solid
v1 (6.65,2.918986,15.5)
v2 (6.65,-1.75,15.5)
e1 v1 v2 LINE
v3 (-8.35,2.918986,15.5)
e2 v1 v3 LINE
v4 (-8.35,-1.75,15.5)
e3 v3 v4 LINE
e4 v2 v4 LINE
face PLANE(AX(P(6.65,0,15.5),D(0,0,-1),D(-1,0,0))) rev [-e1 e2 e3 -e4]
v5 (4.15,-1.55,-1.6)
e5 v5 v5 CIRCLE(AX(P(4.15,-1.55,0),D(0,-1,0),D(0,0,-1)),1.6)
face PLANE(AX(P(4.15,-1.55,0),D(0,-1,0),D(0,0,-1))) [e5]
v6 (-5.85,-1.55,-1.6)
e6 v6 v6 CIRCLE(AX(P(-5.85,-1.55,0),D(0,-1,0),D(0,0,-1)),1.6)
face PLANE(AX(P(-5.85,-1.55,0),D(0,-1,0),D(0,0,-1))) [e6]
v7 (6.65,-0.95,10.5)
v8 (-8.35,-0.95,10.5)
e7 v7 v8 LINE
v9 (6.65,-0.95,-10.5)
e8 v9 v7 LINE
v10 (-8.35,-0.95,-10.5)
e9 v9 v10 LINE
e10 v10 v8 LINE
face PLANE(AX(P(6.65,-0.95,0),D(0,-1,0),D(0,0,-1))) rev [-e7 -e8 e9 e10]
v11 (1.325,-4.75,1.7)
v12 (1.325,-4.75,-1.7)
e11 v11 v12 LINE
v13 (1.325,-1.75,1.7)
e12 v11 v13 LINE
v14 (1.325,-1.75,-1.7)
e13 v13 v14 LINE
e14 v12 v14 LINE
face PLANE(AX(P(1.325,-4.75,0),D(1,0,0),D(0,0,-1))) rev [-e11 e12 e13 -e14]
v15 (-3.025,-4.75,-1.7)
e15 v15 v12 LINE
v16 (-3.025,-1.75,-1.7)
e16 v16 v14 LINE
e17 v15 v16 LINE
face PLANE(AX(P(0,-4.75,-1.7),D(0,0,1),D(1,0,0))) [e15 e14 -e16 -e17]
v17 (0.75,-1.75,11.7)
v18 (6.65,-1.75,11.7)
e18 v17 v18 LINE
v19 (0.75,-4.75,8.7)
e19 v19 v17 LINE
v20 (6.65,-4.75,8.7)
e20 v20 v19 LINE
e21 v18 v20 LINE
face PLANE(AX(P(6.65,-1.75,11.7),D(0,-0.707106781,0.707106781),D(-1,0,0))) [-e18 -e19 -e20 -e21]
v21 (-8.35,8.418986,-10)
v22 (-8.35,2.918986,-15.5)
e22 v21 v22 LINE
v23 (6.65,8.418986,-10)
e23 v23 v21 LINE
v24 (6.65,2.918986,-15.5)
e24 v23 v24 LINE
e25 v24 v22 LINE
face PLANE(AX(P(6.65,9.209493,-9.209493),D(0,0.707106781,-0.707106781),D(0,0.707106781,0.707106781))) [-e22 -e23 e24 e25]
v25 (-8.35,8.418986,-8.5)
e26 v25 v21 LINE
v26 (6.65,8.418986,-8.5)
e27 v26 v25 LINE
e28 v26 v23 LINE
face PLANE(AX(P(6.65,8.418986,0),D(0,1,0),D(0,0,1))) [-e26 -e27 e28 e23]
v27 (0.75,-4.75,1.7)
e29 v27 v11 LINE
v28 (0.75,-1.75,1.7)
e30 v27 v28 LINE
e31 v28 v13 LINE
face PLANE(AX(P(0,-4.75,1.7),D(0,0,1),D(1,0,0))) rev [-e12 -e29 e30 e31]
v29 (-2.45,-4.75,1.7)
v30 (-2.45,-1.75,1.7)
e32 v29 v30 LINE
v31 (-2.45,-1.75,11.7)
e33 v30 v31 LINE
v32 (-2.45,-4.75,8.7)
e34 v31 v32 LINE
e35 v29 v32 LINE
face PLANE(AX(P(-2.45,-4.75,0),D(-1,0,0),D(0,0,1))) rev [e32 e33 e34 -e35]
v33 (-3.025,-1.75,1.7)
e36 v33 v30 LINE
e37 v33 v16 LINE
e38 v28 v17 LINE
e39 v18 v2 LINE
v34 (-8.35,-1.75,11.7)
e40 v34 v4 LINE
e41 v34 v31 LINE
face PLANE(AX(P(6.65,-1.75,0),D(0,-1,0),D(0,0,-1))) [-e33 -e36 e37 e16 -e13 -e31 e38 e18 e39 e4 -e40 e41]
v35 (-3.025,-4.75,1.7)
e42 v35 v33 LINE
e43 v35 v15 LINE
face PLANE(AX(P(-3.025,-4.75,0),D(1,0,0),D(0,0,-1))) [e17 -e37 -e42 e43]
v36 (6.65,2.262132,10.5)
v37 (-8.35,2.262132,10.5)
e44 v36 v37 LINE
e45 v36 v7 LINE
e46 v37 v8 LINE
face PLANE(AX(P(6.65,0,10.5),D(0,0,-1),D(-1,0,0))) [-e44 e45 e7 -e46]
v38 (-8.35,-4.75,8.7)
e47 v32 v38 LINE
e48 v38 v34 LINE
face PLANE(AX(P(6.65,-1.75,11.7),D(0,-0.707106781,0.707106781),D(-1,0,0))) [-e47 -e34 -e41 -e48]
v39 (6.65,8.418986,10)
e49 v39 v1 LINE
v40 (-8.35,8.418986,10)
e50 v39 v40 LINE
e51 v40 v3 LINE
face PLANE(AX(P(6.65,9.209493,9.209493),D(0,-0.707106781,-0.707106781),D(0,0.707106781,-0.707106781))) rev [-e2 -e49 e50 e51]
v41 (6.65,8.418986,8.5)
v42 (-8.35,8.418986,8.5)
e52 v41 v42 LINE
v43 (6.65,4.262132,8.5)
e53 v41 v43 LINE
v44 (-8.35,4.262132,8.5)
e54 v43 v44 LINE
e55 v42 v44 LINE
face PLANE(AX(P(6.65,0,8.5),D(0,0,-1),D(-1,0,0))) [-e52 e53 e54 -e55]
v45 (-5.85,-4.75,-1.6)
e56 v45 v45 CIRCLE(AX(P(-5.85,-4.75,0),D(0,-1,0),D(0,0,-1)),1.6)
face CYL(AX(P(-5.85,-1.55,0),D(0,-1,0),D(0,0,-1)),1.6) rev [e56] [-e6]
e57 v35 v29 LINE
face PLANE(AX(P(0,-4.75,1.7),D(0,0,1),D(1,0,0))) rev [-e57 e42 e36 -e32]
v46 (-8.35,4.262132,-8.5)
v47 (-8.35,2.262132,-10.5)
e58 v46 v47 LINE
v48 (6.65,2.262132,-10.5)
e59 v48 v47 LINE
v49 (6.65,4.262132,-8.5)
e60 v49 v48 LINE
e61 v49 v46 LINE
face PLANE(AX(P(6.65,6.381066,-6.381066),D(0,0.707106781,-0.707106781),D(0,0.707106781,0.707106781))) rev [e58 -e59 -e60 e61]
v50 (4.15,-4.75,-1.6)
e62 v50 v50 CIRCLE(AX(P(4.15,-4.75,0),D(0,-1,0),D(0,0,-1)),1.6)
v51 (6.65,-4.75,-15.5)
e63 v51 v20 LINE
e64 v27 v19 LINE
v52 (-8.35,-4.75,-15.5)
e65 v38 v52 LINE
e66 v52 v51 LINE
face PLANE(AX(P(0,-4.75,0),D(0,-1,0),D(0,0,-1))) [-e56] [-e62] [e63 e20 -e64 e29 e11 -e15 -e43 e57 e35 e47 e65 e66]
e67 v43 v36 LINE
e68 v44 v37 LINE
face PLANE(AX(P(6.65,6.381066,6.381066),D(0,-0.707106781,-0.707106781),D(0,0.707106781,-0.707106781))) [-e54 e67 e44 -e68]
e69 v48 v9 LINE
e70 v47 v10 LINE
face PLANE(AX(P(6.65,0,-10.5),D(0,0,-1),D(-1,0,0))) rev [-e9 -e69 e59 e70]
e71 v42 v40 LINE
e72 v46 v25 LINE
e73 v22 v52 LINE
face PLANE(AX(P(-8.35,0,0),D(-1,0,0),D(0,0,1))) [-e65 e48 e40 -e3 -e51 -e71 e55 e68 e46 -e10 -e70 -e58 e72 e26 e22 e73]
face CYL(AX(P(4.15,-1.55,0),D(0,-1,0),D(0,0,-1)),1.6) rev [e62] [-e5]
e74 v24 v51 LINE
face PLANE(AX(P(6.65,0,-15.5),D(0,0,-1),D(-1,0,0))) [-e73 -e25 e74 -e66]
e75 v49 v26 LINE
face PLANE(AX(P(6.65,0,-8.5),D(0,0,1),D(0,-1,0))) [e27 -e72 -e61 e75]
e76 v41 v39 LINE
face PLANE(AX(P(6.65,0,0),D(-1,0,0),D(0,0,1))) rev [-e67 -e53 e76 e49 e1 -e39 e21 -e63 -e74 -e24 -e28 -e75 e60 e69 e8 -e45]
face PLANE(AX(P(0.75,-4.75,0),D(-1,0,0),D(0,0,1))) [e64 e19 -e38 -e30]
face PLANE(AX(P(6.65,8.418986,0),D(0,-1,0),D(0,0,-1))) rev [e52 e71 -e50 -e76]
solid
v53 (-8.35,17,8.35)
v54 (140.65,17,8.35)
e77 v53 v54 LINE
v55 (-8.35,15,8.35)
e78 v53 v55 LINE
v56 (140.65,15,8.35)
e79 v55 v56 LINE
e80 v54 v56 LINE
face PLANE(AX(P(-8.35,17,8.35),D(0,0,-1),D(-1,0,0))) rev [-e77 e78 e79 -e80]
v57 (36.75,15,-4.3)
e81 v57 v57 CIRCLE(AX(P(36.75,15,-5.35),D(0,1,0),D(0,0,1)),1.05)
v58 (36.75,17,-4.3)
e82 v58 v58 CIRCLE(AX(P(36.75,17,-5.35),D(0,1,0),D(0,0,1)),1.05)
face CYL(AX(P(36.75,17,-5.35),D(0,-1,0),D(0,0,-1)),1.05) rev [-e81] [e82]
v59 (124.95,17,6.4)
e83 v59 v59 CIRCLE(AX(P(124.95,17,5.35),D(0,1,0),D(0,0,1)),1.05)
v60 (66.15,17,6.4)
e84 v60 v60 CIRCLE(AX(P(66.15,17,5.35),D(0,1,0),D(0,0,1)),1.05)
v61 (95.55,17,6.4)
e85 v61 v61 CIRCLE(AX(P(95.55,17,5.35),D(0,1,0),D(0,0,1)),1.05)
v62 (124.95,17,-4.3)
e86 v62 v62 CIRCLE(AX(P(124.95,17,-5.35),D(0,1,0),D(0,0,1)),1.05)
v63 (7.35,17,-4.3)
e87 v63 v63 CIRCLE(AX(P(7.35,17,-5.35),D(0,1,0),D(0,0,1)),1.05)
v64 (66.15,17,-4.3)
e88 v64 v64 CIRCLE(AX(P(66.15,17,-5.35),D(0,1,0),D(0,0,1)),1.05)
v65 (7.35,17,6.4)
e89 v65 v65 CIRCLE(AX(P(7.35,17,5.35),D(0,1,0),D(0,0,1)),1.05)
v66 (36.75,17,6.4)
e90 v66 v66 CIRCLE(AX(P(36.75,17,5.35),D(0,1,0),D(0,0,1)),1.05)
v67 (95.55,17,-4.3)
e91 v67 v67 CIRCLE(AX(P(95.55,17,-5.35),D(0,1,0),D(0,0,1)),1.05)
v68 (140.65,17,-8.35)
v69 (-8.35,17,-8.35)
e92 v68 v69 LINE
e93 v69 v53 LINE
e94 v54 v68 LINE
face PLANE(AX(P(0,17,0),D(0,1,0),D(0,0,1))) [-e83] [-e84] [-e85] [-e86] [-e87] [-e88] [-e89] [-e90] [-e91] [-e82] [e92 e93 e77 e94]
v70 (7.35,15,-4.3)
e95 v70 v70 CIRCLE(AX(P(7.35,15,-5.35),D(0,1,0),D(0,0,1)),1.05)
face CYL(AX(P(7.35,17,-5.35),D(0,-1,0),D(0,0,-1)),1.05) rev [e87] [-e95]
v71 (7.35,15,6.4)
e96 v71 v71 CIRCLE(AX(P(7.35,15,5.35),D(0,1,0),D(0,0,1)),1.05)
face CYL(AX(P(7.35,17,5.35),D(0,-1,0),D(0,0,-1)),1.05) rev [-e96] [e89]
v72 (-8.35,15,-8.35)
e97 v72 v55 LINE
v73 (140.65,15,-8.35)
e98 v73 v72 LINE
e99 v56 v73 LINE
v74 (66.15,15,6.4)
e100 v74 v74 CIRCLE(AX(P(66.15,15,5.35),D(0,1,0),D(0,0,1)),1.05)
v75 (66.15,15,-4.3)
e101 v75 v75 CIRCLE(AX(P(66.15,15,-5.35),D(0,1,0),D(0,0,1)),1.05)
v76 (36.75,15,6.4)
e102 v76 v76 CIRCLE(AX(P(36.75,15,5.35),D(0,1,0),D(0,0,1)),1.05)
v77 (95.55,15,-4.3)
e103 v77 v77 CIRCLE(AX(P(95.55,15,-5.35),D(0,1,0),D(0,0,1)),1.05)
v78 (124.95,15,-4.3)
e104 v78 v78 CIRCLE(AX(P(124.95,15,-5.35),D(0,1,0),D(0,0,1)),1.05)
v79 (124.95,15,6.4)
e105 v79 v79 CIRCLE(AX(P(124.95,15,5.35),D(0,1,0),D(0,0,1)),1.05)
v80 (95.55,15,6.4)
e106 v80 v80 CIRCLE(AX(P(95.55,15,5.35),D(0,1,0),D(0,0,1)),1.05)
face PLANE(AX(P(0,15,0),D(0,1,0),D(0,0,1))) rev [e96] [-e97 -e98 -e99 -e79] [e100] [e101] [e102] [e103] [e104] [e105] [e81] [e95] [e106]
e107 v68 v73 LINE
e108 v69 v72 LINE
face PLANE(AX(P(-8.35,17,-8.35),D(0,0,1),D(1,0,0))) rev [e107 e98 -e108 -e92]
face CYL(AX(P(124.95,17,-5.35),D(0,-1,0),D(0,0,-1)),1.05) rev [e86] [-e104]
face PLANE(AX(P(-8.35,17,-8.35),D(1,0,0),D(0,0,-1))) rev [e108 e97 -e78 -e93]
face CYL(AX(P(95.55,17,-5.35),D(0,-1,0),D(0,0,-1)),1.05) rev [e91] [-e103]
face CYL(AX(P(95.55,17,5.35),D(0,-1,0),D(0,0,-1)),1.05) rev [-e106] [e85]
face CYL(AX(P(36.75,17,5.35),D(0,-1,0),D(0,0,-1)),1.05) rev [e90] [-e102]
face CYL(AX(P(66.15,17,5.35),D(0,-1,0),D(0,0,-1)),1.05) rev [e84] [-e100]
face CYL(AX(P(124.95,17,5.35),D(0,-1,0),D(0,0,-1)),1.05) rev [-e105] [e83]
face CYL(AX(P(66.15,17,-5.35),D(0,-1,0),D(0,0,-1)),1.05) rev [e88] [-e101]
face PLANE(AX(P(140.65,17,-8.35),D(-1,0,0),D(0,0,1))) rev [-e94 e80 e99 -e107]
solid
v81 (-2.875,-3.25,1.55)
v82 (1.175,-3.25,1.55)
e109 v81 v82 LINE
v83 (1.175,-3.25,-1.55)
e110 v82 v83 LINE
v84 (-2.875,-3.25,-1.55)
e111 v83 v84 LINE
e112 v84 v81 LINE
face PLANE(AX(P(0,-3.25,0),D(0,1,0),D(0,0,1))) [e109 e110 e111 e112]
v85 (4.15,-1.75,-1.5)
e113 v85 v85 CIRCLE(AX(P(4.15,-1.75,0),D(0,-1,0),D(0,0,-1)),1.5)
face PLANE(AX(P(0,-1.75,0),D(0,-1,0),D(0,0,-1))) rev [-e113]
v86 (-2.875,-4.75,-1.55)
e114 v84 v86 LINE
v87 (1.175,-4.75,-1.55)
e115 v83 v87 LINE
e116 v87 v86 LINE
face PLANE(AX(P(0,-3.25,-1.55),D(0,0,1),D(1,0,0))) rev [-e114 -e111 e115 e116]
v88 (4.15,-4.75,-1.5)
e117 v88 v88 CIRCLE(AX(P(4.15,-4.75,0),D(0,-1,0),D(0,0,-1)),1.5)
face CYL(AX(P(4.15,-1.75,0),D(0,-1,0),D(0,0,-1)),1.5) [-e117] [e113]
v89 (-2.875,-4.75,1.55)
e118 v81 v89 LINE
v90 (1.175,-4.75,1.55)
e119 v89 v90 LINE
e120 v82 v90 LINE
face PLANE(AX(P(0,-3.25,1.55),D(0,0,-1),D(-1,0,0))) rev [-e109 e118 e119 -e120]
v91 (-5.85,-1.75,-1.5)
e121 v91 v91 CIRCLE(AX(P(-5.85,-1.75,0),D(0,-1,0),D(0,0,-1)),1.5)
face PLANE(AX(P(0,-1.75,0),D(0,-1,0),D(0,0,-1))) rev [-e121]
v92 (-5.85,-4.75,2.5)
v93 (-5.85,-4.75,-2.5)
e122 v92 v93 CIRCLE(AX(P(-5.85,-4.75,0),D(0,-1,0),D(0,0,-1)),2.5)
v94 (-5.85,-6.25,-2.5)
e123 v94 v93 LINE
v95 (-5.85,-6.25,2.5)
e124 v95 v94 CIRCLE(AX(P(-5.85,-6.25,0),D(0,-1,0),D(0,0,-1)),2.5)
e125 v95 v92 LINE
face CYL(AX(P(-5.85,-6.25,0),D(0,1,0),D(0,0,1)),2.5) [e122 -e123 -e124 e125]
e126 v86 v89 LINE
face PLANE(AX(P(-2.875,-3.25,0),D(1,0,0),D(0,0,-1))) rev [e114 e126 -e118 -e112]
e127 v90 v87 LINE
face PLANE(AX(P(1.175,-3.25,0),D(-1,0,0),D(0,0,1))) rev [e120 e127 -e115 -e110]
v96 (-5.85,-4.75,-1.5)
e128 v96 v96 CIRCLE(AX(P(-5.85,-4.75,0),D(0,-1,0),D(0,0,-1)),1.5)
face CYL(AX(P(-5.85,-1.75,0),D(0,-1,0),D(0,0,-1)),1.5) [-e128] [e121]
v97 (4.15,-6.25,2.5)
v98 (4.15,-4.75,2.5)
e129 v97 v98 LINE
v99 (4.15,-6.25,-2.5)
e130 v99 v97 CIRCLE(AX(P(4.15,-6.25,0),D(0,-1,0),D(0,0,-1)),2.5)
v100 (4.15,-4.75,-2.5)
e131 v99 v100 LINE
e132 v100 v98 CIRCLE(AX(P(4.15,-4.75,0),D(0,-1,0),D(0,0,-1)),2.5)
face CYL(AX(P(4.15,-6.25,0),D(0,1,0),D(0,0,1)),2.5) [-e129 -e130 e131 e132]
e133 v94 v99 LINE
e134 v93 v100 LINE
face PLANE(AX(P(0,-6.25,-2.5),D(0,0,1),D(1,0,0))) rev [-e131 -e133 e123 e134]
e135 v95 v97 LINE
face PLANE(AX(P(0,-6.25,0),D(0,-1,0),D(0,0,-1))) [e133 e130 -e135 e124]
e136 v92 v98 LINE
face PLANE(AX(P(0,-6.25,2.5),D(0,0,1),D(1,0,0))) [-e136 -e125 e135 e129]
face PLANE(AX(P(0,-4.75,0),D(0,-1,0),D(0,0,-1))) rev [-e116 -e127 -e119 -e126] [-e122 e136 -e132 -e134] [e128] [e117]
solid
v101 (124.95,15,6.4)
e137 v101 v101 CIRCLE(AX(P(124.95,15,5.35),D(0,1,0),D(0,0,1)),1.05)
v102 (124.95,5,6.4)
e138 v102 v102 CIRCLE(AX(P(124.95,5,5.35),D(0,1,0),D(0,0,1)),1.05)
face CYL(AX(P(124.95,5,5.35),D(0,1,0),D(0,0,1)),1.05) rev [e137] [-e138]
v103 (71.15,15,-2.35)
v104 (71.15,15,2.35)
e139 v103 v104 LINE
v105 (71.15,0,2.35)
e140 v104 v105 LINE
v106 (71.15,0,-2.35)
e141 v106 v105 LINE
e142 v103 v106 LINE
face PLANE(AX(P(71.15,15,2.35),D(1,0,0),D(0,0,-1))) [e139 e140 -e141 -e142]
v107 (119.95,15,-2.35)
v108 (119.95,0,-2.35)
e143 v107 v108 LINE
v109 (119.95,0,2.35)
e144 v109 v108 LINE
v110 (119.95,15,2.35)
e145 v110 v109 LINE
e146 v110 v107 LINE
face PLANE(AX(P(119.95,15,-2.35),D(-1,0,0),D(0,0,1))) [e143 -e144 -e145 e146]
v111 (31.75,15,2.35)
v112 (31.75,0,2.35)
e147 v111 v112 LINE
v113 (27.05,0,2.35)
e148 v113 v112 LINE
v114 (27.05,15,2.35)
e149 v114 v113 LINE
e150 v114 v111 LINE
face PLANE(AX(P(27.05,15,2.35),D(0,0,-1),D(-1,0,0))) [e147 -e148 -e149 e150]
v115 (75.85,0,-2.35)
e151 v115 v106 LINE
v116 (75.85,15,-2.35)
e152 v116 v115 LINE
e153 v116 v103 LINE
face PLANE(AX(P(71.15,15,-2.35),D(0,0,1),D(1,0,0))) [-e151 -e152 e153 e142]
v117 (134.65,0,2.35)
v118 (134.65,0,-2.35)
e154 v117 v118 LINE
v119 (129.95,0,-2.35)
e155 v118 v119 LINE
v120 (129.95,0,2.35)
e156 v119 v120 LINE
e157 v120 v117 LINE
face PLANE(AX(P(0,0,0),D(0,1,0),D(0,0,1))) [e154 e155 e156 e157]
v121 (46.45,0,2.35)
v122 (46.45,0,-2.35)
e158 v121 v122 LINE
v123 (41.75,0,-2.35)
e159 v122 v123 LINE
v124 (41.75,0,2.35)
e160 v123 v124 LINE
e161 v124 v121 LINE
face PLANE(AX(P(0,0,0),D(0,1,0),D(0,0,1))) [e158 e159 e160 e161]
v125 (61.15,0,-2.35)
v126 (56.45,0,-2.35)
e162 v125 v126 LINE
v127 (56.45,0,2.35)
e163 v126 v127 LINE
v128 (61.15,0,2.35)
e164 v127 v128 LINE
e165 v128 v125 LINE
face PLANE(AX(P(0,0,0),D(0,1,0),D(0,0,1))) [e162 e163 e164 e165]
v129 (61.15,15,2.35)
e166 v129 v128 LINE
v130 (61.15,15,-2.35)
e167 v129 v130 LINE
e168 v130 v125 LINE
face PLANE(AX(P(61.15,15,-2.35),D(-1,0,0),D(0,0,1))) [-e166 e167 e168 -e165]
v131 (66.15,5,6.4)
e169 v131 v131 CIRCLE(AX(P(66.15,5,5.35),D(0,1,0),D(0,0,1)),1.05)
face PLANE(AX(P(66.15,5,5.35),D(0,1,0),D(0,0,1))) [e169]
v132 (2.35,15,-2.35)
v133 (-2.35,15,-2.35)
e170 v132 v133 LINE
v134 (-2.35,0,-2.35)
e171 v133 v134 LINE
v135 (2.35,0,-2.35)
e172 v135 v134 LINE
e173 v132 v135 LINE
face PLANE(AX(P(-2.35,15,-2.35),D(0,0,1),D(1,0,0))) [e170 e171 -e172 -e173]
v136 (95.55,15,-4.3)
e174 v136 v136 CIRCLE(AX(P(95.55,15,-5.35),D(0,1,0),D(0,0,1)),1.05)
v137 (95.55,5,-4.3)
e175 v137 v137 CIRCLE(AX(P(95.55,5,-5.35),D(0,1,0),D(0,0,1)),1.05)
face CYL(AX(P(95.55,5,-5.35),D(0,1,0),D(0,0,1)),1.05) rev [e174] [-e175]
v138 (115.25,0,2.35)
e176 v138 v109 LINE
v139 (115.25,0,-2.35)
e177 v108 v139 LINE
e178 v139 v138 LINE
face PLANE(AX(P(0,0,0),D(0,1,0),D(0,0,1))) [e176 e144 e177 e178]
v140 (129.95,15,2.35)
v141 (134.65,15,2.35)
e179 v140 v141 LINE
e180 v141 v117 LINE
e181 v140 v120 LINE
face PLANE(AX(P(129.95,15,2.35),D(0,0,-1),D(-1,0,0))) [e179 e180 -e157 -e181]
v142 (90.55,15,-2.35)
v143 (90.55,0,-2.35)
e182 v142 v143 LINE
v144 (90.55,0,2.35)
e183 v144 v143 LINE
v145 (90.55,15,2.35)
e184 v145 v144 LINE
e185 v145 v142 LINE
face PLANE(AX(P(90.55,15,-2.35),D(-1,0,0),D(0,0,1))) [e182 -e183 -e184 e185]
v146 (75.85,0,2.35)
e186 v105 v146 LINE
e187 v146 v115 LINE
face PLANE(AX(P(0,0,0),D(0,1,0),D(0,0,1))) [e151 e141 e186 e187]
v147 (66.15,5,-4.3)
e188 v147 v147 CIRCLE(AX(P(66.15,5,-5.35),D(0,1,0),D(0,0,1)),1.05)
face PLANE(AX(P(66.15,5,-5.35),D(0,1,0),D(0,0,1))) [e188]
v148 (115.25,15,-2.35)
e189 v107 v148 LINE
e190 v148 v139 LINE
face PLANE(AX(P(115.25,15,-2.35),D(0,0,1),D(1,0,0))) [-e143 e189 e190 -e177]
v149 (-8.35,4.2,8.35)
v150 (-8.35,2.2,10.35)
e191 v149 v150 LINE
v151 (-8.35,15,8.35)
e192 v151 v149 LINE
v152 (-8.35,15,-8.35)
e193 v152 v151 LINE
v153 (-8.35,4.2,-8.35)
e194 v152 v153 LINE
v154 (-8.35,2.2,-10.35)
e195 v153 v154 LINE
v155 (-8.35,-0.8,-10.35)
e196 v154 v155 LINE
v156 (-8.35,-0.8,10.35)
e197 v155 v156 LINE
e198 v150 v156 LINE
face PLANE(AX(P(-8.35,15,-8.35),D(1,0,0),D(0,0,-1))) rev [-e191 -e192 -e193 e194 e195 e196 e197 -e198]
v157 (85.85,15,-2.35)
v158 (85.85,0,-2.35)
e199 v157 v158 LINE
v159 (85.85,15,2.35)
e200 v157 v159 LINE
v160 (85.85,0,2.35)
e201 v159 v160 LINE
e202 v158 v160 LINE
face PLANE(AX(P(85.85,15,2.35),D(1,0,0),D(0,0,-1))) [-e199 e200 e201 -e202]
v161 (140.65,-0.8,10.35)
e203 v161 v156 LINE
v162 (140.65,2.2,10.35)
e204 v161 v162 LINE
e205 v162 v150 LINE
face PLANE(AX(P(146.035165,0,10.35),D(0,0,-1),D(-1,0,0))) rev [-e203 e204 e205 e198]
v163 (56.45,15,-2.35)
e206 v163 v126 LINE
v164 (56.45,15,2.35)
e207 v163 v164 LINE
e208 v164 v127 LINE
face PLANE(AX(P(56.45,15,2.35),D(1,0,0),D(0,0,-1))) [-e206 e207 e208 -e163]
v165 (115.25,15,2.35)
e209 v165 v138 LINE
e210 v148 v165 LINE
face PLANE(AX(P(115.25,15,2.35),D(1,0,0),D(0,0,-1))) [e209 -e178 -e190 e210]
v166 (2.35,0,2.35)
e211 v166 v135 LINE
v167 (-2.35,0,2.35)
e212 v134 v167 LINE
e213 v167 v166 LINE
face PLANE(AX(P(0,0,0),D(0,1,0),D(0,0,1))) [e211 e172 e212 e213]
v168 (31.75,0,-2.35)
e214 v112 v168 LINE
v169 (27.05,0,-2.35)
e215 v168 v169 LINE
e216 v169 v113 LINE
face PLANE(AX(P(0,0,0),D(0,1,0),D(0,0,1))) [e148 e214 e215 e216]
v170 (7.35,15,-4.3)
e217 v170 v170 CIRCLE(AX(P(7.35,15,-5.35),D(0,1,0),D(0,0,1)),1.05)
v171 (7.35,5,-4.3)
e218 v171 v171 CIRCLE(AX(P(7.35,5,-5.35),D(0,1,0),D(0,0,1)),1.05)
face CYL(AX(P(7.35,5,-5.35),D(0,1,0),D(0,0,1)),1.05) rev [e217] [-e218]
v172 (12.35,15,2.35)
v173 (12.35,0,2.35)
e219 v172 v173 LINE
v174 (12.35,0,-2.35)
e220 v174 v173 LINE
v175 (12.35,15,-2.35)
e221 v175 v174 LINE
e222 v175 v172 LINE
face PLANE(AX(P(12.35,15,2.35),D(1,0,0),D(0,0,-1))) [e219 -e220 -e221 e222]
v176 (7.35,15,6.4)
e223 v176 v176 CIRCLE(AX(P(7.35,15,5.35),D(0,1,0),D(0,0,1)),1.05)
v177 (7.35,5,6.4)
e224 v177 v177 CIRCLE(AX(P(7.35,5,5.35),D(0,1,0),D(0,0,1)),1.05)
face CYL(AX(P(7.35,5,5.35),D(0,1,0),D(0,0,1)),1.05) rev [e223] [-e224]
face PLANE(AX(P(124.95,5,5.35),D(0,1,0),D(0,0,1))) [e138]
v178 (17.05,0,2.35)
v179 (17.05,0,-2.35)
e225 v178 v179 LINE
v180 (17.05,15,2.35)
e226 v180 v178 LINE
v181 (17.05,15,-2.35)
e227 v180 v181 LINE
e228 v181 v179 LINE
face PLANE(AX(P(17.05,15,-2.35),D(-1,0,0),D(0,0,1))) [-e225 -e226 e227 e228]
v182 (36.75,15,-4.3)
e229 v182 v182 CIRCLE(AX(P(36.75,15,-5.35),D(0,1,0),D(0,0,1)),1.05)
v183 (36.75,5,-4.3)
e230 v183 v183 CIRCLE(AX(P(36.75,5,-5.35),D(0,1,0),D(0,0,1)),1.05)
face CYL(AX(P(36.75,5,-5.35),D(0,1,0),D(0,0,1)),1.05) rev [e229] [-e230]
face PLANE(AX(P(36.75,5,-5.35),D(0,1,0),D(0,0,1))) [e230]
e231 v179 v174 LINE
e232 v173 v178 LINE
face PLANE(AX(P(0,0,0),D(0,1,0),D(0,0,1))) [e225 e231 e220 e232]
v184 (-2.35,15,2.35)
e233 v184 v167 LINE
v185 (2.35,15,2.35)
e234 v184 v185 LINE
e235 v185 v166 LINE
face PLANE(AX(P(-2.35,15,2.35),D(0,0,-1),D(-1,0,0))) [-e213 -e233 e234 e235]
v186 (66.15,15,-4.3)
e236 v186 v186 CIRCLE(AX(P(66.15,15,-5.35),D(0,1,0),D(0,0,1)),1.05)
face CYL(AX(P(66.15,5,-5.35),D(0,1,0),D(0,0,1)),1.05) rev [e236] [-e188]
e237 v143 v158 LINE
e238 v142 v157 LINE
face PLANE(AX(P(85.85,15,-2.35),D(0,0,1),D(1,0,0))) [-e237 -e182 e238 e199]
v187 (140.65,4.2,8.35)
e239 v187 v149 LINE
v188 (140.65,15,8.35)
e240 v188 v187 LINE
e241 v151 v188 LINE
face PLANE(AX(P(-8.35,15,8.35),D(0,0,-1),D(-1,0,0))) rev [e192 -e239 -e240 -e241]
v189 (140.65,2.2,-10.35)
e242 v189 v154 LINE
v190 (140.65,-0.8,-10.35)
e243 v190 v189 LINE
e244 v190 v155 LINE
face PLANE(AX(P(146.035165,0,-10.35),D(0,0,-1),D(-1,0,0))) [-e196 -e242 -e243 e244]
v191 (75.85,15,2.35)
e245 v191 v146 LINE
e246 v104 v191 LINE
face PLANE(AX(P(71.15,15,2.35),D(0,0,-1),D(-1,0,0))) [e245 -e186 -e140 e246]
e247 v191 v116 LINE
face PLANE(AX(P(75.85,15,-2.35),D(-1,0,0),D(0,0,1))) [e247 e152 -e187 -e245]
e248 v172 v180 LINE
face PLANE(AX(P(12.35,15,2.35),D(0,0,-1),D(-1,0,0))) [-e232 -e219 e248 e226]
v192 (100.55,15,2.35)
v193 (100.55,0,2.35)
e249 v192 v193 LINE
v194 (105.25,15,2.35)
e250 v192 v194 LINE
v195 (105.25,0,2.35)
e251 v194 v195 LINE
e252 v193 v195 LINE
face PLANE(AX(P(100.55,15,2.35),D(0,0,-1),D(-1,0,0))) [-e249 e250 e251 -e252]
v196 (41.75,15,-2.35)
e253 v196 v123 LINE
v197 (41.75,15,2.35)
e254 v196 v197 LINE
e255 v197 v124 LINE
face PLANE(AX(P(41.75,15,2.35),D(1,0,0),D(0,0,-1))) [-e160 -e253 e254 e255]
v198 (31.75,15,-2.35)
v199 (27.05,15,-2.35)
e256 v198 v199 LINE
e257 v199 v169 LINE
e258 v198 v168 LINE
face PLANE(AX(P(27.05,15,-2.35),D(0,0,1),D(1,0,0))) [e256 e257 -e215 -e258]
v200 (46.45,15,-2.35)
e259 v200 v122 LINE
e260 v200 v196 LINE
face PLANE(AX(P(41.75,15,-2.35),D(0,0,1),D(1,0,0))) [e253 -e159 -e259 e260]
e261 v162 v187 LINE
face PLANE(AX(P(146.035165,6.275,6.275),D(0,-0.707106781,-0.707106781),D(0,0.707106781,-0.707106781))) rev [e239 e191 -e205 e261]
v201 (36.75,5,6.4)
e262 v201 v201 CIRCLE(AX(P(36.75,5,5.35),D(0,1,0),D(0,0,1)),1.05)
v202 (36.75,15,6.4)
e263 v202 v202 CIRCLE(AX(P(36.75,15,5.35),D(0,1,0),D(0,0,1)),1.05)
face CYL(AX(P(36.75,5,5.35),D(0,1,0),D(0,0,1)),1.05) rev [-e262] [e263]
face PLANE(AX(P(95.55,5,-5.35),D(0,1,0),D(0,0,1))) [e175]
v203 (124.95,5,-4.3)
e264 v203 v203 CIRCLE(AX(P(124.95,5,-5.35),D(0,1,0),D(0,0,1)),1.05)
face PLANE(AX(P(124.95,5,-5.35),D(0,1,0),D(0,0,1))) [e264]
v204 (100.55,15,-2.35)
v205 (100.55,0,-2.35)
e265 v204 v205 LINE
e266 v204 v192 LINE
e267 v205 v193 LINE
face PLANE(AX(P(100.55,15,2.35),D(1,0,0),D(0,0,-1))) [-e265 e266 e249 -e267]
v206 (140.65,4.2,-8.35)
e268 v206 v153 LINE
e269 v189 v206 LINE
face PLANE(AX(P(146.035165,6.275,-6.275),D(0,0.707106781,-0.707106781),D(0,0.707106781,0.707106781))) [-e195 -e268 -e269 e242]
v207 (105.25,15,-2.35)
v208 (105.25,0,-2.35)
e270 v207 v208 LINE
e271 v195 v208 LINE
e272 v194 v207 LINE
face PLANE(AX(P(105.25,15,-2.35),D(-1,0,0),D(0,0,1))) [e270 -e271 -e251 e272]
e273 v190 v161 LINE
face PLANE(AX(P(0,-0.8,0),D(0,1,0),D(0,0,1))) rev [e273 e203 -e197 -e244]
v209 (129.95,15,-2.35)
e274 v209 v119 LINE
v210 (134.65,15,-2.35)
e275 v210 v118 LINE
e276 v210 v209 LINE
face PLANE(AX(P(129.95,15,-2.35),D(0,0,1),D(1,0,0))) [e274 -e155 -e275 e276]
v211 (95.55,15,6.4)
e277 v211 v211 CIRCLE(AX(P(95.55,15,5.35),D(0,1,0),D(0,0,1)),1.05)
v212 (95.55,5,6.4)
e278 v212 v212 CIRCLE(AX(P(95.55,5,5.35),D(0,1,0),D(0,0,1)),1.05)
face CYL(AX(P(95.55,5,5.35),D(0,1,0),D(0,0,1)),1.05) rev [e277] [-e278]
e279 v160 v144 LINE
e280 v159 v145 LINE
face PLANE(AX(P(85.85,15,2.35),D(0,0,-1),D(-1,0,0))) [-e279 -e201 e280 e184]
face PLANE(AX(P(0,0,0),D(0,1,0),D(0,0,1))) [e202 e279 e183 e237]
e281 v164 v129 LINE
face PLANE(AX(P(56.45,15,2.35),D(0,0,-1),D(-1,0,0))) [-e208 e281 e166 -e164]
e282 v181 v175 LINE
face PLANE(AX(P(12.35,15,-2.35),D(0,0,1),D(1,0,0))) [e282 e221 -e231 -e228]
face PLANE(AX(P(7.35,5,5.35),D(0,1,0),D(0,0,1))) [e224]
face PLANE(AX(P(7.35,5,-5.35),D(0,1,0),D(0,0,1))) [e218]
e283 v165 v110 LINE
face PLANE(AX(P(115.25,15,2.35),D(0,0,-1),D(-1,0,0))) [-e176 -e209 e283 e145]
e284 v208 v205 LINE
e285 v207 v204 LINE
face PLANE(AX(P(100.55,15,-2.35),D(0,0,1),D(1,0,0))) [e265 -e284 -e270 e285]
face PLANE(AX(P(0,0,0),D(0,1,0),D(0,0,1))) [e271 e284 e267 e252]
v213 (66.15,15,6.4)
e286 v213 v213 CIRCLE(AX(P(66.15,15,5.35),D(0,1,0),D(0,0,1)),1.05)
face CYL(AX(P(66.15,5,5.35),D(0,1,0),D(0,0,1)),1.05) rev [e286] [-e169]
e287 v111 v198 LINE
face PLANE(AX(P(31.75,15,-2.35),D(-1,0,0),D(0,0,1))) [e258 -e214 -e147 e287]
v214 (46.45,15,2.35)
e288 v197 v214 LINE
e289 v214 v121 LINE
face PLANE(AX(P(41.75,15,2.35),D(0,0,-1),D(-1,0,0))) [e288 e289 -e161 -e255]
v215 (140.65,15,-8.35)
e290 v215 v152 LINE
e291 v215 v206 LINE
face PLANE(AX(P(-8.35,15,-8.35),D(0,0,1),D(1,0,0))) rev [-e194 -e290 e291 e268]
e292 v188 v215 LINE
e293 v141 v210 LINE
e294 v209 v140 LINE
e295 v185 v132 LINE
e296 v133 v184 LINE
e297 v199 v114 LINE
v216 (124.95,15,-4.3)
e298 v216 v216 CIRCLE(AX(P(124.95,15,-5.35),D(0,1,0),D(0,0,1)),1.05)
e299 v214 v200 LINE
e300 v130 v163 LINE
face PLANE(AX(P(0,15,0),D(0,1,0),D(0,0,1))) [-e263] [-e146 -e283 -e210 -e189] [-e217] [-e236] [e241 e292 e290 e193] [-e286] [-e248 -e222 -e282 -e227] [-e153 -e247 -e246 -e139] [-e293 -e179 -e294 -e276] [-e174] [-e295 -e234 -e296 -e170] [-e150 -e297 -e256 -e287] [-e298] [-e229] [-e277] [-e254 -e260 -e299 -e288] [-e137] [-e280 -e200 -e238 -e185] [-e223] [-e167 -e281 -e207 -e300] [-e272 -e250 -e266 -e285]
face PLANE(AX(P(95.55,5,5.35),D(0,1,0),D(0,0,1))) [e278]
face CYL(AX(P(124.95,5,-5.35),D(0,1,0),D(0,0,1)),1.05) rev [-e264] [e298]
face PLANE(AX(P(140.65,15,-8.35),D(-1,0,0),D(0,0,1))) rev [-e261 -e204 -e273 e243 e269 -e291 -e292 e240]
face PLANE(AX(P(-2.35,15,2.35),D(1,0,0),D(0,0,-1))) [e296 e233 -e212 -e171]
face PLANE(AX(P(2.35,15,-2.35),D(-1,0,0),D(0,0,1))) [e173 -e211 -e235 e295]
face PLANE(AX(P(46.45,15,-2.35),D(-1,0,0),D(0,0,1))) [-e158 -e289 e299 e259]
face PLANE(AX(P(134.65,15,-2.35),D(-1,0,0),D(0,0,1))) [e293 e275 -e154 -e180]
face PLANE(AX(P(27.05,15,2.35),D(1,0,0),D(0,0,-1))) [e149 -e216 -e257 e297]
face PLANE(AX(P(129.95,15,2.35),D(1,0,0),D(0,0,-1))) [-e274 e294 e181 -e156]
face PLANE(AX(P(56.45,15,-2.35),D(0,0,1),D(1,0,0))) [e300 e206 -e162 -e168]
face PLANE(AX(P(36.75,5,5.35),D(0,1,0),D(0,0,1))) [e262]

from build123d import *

# Parameters (mm, degrees)
SKETCH1_W             = 149
SKETCH1_H             = 16.7
SKETCH1_W_2           = 4.7
SKETCH1_H_2           = 4.7
BOSS_EXTRUDE1_DEPTH   = 15
SKETCH1_2_W           = 149
SKETCH1_2_H           = 16.7
BOSS_EXTRUDE2_DEPTH   = 0.8
BOSS_EXTRUDE3_DEPTH   = 149
BOSS_EXTRUDE4_DEPTH   = 15
BOSS_EXTRUDE5_DEPTH   = 3
SKETCH5_W             = 149
SKETCH5_H             = 16.7
SKETCH5_R             = 1.05
BOSS_EXTRUDE6_DEPTH   = 2
SKETCH5_2_R           = 1.05
CUT_EXTRUDE1_DEPTH    = 10
SKETCH7_R             = 1.6
CUT_EXTRUDE2_DEPTH    = 3.2
SKETCH7_4_R           = 1.5
BOSS_EXTRUDE8_DEPTH   = 3
BOSS_EXTRUDE8_2_DEPTH = 3
SKETCH7_5_R           = 2.5
SKETCH7_5_R_2         = 1.6
SKETCH7_5_R_3         = 1.5
BOSS_EXTRUDE9_DEPTH   = 1.5
BOSS_EXTRUDE10_DEPTH  = 1.5
CHAMFER1_SIZE         = 4


with BuildPart() as part:
    # Sketch1 → Boss-Extrude1 (new body)
    with BuildSketch(Plane(origin=(0, 0, 0), x_dir=(1, 0, 0), z_dir=(0, 1, 0))):
        with Locations((66.15, 0)):
            Rectangle(SKETCH1_W, SKETCH1_H)
        Rectangle(SKETCH1_W_2, SKETCH1_H_2, mode=Mode.SUBTRACT)
        with Locations((14.7, 0)):
            Rectangle(SKETCH1_W_2, SKETCH1_H_2, mode=Mode.SUBTRACT)
        with Locations((29.4, 0)):
            Rectangle(SKETCH1_W_2, SKETCH1_H_2, mode=Mode.SUBTRACT)
        with Locations((44.1, 0)):
            Rectangle(SKETCH1_W_2, SKETCH1_H_2, mode=Mode.SUBTRACT)
        with Locations((58.8, 0)):
            Rectangle(SKETCH1_W_2, SKETCH1_H_2, mode=Mode.SUBTRACT)
        with Locations((73.5, 0)):
            Rectangle(SKETCH1_W_2, SKETCH1_H_2, mode=Mode.SUBTRACT)
        with Locations((88.2, 0)):
            Rectangle(SKETCH1_W_2, SKETCH1_H_2, mode=Mode.SUBTRACT)
        with Locations((102.9, 0)):
            Rectangle(SKETCH1_W_2, SKETCH1_H_2, mode=Mode.SUBTRACT)
        with Locations((117.6, 0)):
            Rectangle(SKETCH1_W_2, SKETCH1_H_2, mode=Mode.SUBTRACT)
        with Locations((132.3, 0)):
            Rectangle(SKETCH1_W_2, SKETCH1_H_2, mode=Mode.SUBTRACT)
    extrude(amount=BOSS_EXTRUDE1_DEPTH)

    # Sketch1<2> → Boss-Extrude2 (add)
    with BuildSketch(Plane(origin=(0, 0, 0), x_dir=(1, 0, 0), z_dir=(0, 1, 0))):
        with Locations((66.15, 0)):
            Rectangle(SKETCH1_2_W, SKETCH1_2_H)
    extrude(amount=-BOSS_EXTRUDE2_DEPTH)

    # Sketch3 → Boss-Extrude3 (add)
    with BuildSketch(Plane.ZY.offset(8.35)):
        Polygon((-10.35, -0.8), (-8.35, -0.8), (-8.35, 4.2), (-10.35, 2.2), align=None)
        Polygon((10.35, 2.2), (8.35, 4.2), (8.35, -0.8), (10.35, -0.8), align=None)
    extrude(amount=-BOSS_EXTRUDE3_DEPTH)

    # Sketch5<2> → Cut-Extrude1 (cut)
    with BuildSketch(Plane(origin=(0, 15, 0), x_dir=(1, 0, 0), z_dir=(0, 1, 0))):
        with Locations(Location((7.35, 5.35, 0), (0, 0, 270))):
            Circle(SKETCH5_2_R)
        with Locations(Location((7.35, -5.35, 0), (0, 0, 270))):
            Circle(SKETCH5_2_R)
        with Locations(Location((36.75, 5.35, 0), (0, 0, 270))):
            Circle(SKETCH5_2_R)
        with Locations(Location((36.75, -5.35, 0), (0, 0, 270))):
            Circle(SKETCH5_2_R)
        with Locations(Location((66.15, 5.35, 0), (0, 0, 270))):
            Circle(SKETCH5_2_R)
        with Locations(Location((66.15, -5.35, 0), (0, 0, 270))):
            Circle(SKETCH5_2_R)
        with Locations(Location((95.55, 5.35, 0), (0, 0, 270))):
            Circle(SKETCH5_2_R)
        with Locations(Location((95.55, -5.35, 0), (0, 0, 270))):
            Circle(SKETCH5_2_R)
        with Locations(Location((124.95, 5.35, 0), (0, 0, 270))):
            Circle(SKETCH5_2_R)
        with Locations(Location((124.95, -5.35, 0), (0, 0, 270))):
            Circle(SKETCH5_2_R)
    extrude(amount=-CUT_EXTRUDE1_DEPTH, mode=Mode.SUBTRACT)


with BuildPart() as body_2:
    # Sketch3<3> → Boss-Extrude4 (new body)
    with BuildSketch(Plane.ZY.offset(8.35)):
        Polygon((-8.5, 4.262132034), (-10.5, 2.262132034), (-10.5, -0.95), (10.5, -0.95), (10.5, 2.262132034), (8.5, 4.262132034), (8.5, 8.418986284), (10, 8.418986284), (15.5, 2.918986284), (15.5, -1.75), (-15.5, -1.75), (-15.5, 2.918986284), (-10, 8.418986284), (-8.5, 8.418986284), align=None)
    extrude(amount=-BOSS_EXTRUDE4_DEPTH)

    # Sketch4 → Boss-Extrude5 (add)
    with BuildSketch(Plane.XZ.offset(1.75)):
        Polygon((-3.025, -1.7), (-3.025, 1.7), (-2.45, 1.7), (-2.45, 7.7), (-8.35, 7.7), (-8.35, -15.5), (6.65, -15.5), (6.65, 7.7), (0.75, 7.7), (0.75, 1.7), (1.325, 1.7), (1.325, -1.7), align=None)
    extrude(amount=BOSS_EXTRUDE5_DEPTH)

    # Sketch7 → Cut-Extrude2 (cut)
    with BuildSketch(Plane.XZ.offset(4.75)):
        with Locations(Location((-5.85, 0, 0), (0, 0, 270))):
            Circle(SKETCH7_R)
        with Locations(Location((4.15, 0, 0), (0, 0, 270))):
            Circle(SKETCH7_R)
    extrude(amount=-CUT_EXTRUDE2_DEPTH, mode=Mode.SUBTRACT)

    # Chamfer1
    # the kernel refuses this chamfer: 4 mm, written as the material it adds along each edge
    with BuildSketch(Plane(origin=(6.65, -1.75, 7.7), x_dir=(0, 0.027495876610586372, 0.9996219169112968), z_dir=(-1, 0, 0))) as chamfer1_piece_1_section:
        Polygon((CHAMFER1_SIZE * 0.999621916911, -CHAMFER1_SIZE * 0.0274958766106), (-CHAMFER1_SIZE * 0.0274958766106, -CHAMFER1_SIZE * 0.999621916911), (0, 0), align=None)
    chamfer1_piece_1 = extrude(amount=5.9, mode=Mode.PRIVATE)
    chamfer1_piece_1 = split(chamfer1_piece_1, bisect_by=Plane(origin=(3.7, -4.75, 9.107836441), z_dir=(0, 1, 0)), keep=Keep.TOP, mode=Mode.PRIVATE)
    add(chamfer1_piece_1)
    with BuildSketch(Plane(origin=(6.65, -1.75, 7.7), x_dir=(0, 0.027495876610586372, 0.9996219169112968), z_dir=(-1, 0, 0))) as chamfer1_piece_2_section:
        Polygon((CHAMFER1_SIZE * 0.999621916911, -CHAMFER1_SIZE * 0.0274958766106), (-CHAMFER1_SIZE * 0.0274958766106, -CHAMFER1_SIZE * 0.999621916911), (0, 0), align=None)
    chamfer1_piece_2 = extrude(amount=16.186731952, mode=Mode.PRIVATE)
    chamfer1_piece_2 = split(chamfer1_piece_2, bisect_by=Plane(origin=(-8.35, -2.89994565, 9.107836441), z_dir=(1, 0, 0)), keep=Keep.TOP, mode=Mode.PRIVATE)
    chamfer1_piece_2 = split(chamfer1_piece_2, bisect_by=Plane(origin=(-2.45, -2.89994565, 9.107836441), z_dir=(-1, 0, 0)), keep=Keep.TOP, mode=Mode.PRIVATE)
    chamfer1_piece_2 = split(chamfer1_piece_2, bisect_by=Plane(origin=(-5.4, -4.75, 9.107836441), z_dir=(0, 1, 0)), keep=Keep.TOP, mode=Mode.PRIVATE)
    add(chamfer1_piece_2)
    with BuildSketch(Plane(origin=(7.836731952, -1.75, 7.7), x_dir=(0, 0.02749587661058636, 0.9996219169112968), z_dir=(-1, 0, 0))) as chamfer1_piece_3_section:
        Polygon((CHAMFER1_SIZE * 0.999621916911, -CHAMFER1_SIZE * 0.0274958766106), (-CHAMFER1_SIZE * 0.0274958766106, -CHAMFER1_SIZE * 0.999621916911), (0, 0), align=None)
    chamfer1_piece_3 = extrude(amount=16.186731952, mode=Mode.PRIVATE)
    chamfer1_piece_3 = split(chamfer1_piece_3, bisect_by=Plane(origin=(6.65, -2.89994565, 9.107836441), z_dir=(-1, 0, 0)), keep=Keep.TOP, mode=Mode.PRIVATE)
    chamfer1_piece_3 = split(chamfer1_piece_3, bisect_by=Plane(origin=(3.7, -4.75, 9.107836441), z_dir=(0, 1, 0)), keep=Keep.TOP, mode=Mode.PRIVATE)
    chamfer1_piece_3 = split(chamfer1_piece_3, bisect_by=Plane(origin=(0.75, -2.89994565, 9.107836441), z_dir=(1, 0, 0)), keep=Keep.TOP, mode=Mode.PRIVATE)
    add(chamfer1_piece_3)
    with BuildSketch(Plane(origin=(-2.45, -1.75, 7.7), x_dir=(0, 0.027495876610586372, 0.9996219169112968), z_dir=(-1, 0, 0))) as chamfer1_piece_4_section:
        Polygon((CHAMFER1_SIZE * 0.999621916911, -CHAMFER1_SIZE * 0.0274958766106), (-CHAMFER1_SIZE * 0.0274958766106, -CHAMFER1_SIZE * 0.999621916911), (0, 0), align=None)
    chamfer1_piece_4 = extrude(amount=5.9, mode=Mode.PRIVATE)
    chamfer1_piece_4 = split(chamfer1_piece_4, bisect_by=Plane(origin=(-5.4, -4.75, 9.107836441), z_dir=(0, 1, 0)), keep=Keep.TOP, mode=Mode.PRIVATE)
    add(chamfer1_piece_4)


with BuildPart() as body_3:
    # Sketch5 → Boss-Extrude6 (new body)
    with BuildSketch(Plane(origin=(0, 15, 0), x_dir=(1, 0, 0), z_dir=(0, 1, 0))):
        with Locations((66.15, 0)):
            Rectangle(SKETCH5_W, SKETCH5_H)
        with Locations(Location((7.35, 5.35, 0), (0, 0, 270))):
            Circle(SKETCH5_R, mode=Mode.SUBTRACT)
        with Locations(Location((7.35, -5.35, 0), (0, 0, 270))):
            Circle(SKETCH5_R, mode=Mode.SUBTRACT)
        with Locations(Location((36.75, 5.35, 0), (0, 0, 270))):
            Circle(SKETCH5_R, mode=Mode.SUBTRACT)
        with Locations(Location((36.75, -5.35, 0), (0, 0, 270))):
            Circle(SKETCH5_R, mode=Mode.SUBTRACT)
        with Locations(Location((66.15, 5.35, 0), (0, 0, 270))):
            Circle(SKETCH5_R, mode=Mode.SUBTRACT)
        with Locations(Location((66.15, -5.35, 0), (0, 0, 270))):
            Circle(SKETCH5_R, mode=Mode.SUBTRACT)
        with Locations(Location((95.55, 5.35, 0), (0, 0, 270))):
            Circle(SKETCH5_R, mode=Mode.SUBTRACT)
        with Locations(Location((95.55, -5.35, 0), (0, 0, 270))):
            Circle(SKETCH5_R, mode=Mode.SUBTRACT)
        with Locations(Location((124.95, 5.35, 0), (0, 0, 270))):
            Circle(SKETCH5_R, mode=Mode.SUBTRACT)
        with Locations(Location((124.95, -5.35, 0), (0, 0, 270))):
            Circle(SKETCH5_R, mode=Mode.SUBTRACT)
    extrude(amount=BOSS_EXTRUDE6_DEPTH)


with BuildPart() as body_4:
    # Sketch7<4> → Boss-Extrude8 (new body)
    with BuildSketch(Plane.XZ.offset(4.75)):
        with Locations(Location((-5.85, 0, 0), (0, 0, 270))):
            Circle(SKETCH7_4_R)
    extrude(amount=-BOSS_EXTRUDE8_DEPTH)



with BuildPart() as body_5:
    # Sketch7<4> → Boss-Extrude8 2 (new body)
    with BuildSketch(Plane.XZ.offset(4.75)):
        with Locations(Location((4.15, 0, 0), (0, 0, 270))):
            Circle(SKETCH7_4_R)
    extrude(amount=-BOSS_EXTRUDE8_2_DEPTH)


with BuildPart() as body_4_1:
    add(body_4.part)

    add(body_5.part)  # Boss-Extrude9 merges body 5
    # Sketch7<5> → Boss-Extrude9 (add)
    # profile 1 of 8: a face of its own
    with BuildSketch(Plane.XZ.offset(4.75)):
        with Locations((-5.85, 0)):
            Circle(SKETCH7_5_R)
        with Locations(Location((-5.85, 0, 0), (0, 0, 270))):
            Circle(SKETCH7_5_R_2, mode=Mode.SUBTRACT)
    # profile 2 of 8: a face of its own
    with BuildSketch(Plane.XZ.offset(4.75)):
        Polygon((0.75, 2.5), (-2.45, 2.5), (-2.45, 1.7), (-3.025, 1.7), (-3.025, -1.7), (1.325, -1.7), (1.325, 1.7), (0.75, 1.7), align=None)
    # profile 3 of 8: a face of its own
    with BuildSketch(Plane.XZ.offset(4.75)):
        with BuildLine():
            Line((-2.45, 2.5), (-5.85, 2.5))
            ThreePointArc((-5.85, 2.5), (-4.082233047, 1.767766953), (-3.35, 0))
            ThreePointArc((-3.35, 0), (-4.082233047, -1.767766953), (-5.85, -2.5))
            Line((-5.85, -2.5), (4.15, -2.5))
            ThreePointArc((4.15, -2.5), (1.65, 0), (4.15, 2.5))
            Line((4.15, 2.5), (0.75, 2.5))
            Line((0.75, 2.5), (0.75, 1.7))
            Line((0.75, 1.7), (1.325, 1.7))
            Line((1.325, 1.7), (1.325, -1.7))
            Line((1.325, -1.7), (-3.025, -1.7))
            Line((-3.025, -1.7), (-3.025, 1.7))
            Line((-3.025, 1.7), (-2.45, 1.7))
            Line((-2.45, 1.7), (-2.45, 2.5))
        make_face()
    # profile 4 of 8: a face of its own
    with BuildSketch(Plane.XZ.offset(4.75)):
        with Locations((4.15, 0)):
            Circle(SKETCH7_5_R)
        with Locations(Location((4.15, 0, 0), (0, 0, 270))):
            Circle(SKETCH7_5_R_2, mode=Mode.SUBTRACT)
    # profile 5 of 8: a face of its own
    with BuildSketch(Plane.XZ.offset(4.75)):
        with Locations(Location((4.15, 0, 0), (0, 0, 270))):
            Circle(SKETCH7_5_R_2)
        with Locations(Location((4.15, 0, 0), (0, 0, 270))):
            Circle(SKETCH7_5_R_3, mode=Mode.SUBTRACT)
    # profile 6 of 8: a face of its own
    with BuildSketch(Plane.XZ.offset(4.75)):
        with Locations(Location((-5.85, 0, 0), (0, 0, 270))):
            Circle(SKETCH7_5_R_2)
        with Locations(Location((-5.85, 0, 0), (0, 0, 270))):
            Circle(SKETCH7_5_R_3, mode=Mode.SUBTRACT)
    # profile 7 of 8: a face of its own
    with BuildSketch(Plane.XZ.offset(4.75)):
        with Locations(Location((-5.85, 0, 0), (0, 0, 270))):
            Circle(SKETCH7_5_R_3)
    # profile 8 of 8: a face of its own
    with BuildSketch(Plane.XZ.offset(4.75)):
        with Locations(Location((4.15, 0, 0), (0, 0, 270))):
            Circle(SKETCH7_5_R_3)
    extrude(amount=BOSS_EXTRUDE9_DEPTH)

    # Sketch8 → Boss-Extrude10 (add)
    with BuildSketch(Plane(origin=(0, -4.75, 0), x_dir=(1, 0, 0), z_dir=(0, 1, 0))):
        Polygon((-2.45, -1.55), (0.75, -1.55), (1.175, -1.55), (1.175, 1.55), (-2.875, 1.55), (-2.875, -1.55), align=None)
    extrude(amount=BOSS_EXTRUDE10_DEPTH)


solid = Compound([part.part, body_2.part, body_3.part, body_4_1.part])
